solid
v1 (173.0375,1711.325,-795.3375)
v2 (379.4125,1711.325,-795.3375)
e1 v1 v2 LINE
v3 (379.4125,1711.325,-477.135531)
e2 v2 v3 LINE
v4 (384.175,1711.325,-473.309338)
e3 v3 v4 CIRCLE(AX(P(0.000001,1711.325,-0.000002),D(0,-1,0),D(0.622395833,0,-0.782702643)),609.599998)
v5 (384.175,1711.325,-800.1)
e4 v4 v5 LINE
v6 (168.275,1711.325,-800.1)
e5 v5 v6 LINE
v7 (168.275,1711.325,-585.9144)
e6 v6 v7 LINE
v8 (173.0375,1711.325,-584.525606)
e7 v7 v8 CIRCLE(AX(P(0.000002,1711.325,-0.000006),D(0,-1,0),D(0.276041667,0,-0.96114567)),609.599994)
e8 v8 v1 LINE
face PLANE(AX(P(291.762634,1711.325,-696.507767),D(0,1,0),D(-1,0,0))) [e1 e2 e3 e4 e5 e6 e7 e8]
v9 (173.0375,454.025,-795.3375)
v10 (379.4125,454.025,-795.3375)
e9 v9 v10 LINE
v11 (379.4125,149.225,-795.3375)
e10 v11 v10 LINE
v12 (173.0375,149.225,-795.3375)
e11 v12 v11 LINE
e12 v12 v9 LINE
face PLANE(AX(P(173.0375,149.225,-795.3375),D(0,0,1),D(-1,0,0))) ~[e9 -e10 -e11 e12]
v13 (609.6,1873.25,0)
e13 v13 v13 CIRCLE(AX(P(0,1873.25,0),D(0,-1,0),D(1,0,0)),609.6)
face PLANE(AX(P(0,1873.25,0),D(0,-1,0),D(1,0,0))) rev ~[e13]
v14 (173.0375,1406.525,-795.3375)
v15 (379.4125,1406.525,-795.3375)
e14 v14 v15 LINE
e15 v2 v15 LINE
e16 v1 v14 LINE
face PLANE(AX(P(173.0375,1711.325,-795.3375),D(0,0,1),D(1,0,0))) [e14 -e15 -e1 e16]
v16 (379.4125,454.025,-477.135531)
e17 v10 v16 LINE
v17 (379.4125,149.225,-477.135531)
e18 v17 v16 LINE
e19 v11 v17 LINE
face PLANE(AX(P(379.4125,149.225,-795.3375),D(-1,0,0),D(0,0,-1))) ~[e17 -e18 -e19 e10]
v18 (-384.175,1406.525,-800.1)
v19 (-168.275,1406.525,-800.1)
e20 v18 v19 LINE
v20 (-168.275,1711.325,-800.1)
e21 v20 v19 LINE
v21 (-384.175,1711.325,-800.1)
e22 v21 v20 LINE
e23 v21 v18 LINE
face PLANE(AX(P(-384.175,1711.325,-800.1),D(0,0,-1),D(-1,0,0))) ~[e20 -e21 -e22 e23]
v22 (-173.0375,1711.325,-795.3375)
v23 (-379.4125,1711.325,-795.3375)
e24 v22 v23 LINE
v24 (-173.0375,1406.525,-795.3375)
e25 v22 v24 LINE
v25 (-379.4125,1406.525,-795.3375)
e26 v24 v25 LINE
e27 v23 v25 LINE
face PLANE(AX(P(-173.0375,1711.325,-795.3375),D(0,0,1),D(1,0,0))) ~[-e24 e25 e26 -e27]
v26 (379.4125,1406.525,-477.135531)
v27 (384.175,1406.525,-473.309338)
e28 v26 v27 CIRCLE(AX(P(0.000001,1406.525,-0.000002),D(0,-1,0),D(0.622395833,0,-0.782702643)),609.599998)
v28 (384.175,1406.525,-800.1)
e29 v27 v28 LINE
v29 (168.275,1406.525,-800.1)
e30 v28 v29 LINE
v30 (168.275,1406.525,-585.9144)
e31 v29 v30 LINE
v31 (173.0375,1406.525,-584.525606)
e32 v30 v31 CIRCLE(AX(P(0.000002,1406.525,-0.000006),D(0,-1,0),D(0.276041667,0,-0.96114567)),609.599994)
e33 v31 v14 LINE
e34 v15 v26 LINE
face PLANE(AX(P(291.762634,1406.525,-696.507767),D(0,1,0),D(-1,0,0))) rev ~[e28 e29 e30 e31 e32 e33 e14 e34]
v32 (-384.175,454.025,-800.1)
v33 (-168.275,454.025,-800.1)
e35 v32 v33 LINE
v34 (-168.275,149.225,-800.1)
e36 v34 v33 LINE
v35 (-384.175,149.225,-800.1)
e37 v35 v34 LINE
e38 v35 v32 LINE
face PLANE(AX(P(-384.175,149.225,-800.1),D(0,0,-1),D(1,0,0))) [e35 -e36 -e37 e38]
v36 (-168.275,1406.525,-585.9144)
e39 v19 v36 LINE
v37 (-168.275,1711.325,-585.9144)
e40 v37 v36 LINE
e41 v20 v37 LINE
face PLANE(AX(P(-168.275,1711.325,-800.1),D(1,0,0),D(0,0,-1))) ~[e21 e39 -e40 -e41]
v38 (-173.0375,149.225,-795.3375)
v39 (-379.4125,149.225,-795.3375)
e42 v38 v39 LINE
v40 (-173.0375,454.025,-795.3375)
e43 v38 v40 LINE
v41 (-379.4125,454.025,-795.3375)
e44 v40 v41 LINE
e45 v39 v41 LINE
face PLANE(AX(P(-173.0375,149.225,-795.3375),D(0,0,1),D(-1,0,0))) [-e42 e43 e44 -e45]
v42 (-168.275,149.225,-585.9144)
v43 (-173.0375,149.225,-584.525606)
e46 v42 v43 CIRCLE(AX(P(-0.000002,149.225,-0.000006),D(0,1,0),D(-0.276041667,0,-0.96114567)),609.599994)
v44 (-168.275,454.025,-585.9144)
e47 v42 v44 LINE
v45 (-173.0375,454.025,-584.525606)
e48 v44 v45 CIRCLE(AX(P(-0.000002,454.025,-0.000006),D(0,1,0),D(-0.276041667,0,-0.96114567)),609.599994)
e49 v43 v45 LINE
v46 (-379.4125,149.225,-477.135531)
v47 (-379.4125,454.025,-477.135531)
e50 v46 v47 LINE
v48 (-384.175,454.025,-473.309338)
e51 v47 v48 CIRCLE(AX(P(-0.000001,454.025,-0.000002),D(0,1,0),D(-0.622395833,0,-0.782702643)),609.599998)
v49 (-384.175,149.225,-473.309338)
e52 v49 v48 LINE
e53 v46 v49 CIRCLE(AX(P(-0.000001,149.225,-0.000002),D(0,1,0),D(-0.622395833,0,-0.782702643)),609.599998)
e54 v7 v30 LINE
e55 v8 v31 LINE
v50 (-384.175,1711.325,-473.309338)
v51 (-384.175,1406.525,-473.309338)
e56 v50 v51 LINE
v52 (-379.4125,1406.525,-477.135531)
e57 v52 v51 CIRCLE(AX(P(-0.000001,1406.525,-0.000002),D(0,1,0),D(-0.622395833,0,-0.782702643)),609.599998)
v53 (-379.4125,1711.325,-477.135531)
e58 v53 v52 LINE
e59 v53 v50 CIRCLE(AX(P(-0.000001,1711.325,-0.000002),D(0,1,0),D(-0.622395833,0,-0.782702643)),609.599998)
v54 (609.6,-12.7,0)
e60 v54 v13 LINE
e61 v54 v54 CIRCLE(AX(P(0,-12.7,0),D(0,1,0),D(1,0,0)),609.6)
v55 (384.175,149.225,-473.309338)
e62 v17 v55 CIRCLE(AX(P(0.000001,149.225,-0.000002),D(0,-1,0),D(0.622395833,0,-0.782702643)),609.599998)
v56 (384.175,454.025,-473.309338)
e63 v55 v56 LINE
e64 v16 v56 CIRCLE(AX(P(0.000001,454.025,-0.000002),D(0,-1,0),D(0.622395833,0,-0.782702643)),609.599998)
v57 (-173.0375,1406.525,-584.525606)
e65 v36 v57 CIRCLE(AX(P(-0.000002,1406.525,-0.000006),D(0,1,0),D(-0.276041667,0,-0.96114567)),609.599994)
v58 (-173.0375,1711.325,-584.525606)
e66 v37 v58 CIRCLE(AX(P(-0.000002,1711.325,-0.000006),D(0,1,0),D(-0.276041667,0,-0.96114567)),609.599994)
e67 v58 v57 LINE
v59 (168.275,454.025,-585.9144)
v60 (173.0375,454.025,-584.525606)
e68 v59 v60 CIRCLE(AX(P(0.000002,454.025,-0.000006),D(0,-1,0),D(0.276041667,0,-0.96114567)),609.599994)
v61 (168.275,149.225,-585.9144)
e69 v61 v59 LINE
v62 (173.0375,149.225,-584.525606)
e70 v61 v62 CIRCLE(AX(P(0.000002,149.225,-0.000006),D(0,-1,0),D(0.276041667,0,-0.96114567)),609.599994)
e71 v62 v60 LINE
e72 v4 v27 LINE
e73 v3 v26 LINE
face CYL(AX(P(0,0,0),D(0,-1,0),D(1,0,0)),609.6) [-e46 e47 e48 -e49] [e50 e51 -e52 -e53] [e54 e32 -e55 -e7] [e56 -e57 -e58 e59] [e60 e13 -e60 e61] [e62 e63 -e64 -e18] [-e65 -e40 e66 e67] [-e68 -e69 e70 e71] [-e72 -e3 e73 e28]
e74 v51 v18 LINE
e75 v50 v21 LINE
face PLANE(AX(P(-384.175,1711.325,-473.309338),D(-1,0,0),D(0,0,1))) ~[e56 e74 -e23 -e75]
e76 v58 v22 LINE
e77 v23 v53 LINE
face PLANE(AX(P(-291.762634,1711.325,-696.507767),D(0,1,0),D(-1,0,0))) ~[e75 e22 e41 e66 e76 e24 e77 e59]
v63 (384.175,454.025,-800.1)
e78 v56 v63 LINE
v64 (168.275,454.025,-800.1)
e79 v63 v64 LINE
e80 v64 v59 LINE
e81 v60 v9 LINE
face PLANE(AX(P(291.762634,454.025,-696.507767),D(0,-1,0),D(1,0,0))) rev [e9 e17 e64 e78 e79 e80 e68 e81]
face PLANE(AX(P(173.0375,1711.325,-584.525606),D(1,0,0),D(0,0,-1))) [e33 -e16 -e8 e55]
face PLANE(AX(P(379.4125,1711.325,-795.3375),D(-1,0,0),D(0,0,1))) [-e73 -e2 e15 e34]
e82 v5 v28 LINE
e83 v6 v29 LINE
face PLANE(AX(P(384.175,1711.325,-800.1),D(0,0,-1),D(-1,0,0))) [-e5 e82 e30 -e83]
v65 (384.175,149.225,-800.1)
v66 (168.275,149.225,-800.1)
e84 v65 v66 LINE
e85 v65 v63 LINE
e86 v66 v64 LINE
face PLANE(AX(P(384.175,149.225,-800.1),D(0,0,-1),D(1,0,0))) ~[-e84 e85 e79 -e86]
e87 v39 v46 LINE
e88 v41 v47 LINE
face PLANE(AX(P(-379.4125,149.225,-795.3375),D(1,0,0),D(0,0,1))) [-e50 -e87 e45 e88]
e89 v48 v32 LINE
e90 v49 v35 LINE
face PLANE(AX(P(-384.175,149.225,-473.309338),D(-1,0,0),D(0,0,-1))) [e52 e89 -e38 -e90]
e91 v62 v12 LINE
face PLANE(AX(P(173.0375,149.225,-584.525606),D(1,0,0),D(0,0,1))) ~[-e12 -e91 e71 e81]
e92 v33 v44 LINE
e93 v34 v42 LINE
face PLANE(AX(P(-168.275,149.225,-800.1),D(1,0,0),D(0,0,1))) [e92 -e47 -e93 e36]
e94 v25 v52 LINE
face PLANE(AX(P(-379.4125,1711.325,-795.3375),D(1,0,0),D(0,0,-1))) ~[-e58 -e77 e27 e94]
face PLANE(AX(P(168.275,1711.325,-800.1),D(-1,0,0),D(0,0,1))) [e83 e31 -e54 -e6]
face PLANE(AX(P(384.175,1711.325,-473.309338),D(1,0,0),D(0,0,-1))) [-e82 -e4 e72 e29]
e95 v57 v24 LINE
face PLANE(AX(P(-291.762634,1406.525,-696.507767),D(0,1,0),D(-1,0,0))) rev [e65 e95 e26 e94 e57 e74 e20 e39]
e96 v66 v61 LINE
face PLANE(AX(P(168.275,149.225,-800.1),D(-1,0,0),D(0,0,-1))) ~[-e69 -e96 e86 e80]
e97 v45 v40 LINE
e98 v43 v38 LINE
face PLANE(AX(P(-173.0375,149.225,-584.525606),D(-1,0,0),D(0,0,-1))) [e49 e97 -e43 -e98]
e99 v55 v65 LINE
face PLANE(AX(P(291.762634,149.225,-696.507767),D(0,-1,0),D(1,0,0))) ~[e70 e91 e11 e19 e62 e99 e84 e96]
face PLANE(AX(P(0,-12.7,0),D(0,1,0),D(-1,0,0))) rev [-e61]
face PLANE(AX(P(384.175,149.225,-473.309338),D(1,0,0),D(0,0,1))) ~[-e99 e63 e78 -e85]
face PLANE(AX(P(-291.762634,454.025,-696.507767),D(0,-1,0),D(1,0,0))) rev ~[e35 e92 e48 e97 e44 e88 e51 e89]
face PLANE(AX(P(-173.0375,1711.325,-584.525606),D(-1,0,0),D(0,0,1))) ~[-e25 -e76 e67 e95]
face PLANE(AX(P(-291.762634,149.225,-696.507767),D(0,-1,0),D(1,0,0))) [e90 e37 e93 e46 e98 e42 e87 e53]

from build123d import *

# Parameters (mm, degrees)
F0_R     = 609.6
F1_DEPTH = 1873.25
F4_DEPTH = 304.8


# Not quite as in the source:
# - a feature of the source that left no trace in its solid (it failed there, or was rolled back) is left out
# - a pattern or mirror of a feature is missing from the dataset's text; its kind, count and spacing are read off the source's solid


with BuildPart() as f1:
    # F0 (on Front) → F1 (new body)
    with BuildSketch(Plane.XZ):
        Circle(F0_R)
    extrude(amount=-F1_DEPTH)

    # F1_copies: F1 across plane


with BuildPart() as f1_1:
    add(f1.part)
    add(f1.part.mirror(Plane(origin=(0, 930.275, 0), x_dir=(0, 0, -1), z_dir=(0, -1, 0))))

    # F3 (on offset) → F4 (join)
    with BuildSketch(Plane.XZ.offset(-149.225)):
        with BuildLine():
            Line((-384.175, -473.3093379334), (-384.175, -800.1))
            Line((-384.175, -800.1), (-168.275, -800.1))
            Line((-168.275, -800.1), (-168.275, -585.9144002113))
            ThreePointArc((-168.275, -585.9144002113), (-170.6576627394, -585.2248475145), (-173.0375, -584.5256055929))
            Line((-173.0375, -584.5256055929), (-173.0375, -795.3375))
            Line((-173.0375, -795.3375), (-379.4125, -795.3375))
            Line((-379.4125, -795.3375), (-379.4125, -477.1355308964))
            ThreePointArc((-379.4125, -477.1355308964), (-381.7985430528, -475.2284003748), (-384.175, -473.3093379334))
        make_face()
    f4 = extrude(amount=-F4_DEPTH)

    # F4_copies: F4 across plane
    add(f4.mirror(Plane.ZX.offset(930.275)))

    # F5: F1 across plane


with BuildPart() as f1_2:
    add(f1_1.part)
    add(f1_1.part.mirror(Plane.YZ))


solid = f1_2.part
